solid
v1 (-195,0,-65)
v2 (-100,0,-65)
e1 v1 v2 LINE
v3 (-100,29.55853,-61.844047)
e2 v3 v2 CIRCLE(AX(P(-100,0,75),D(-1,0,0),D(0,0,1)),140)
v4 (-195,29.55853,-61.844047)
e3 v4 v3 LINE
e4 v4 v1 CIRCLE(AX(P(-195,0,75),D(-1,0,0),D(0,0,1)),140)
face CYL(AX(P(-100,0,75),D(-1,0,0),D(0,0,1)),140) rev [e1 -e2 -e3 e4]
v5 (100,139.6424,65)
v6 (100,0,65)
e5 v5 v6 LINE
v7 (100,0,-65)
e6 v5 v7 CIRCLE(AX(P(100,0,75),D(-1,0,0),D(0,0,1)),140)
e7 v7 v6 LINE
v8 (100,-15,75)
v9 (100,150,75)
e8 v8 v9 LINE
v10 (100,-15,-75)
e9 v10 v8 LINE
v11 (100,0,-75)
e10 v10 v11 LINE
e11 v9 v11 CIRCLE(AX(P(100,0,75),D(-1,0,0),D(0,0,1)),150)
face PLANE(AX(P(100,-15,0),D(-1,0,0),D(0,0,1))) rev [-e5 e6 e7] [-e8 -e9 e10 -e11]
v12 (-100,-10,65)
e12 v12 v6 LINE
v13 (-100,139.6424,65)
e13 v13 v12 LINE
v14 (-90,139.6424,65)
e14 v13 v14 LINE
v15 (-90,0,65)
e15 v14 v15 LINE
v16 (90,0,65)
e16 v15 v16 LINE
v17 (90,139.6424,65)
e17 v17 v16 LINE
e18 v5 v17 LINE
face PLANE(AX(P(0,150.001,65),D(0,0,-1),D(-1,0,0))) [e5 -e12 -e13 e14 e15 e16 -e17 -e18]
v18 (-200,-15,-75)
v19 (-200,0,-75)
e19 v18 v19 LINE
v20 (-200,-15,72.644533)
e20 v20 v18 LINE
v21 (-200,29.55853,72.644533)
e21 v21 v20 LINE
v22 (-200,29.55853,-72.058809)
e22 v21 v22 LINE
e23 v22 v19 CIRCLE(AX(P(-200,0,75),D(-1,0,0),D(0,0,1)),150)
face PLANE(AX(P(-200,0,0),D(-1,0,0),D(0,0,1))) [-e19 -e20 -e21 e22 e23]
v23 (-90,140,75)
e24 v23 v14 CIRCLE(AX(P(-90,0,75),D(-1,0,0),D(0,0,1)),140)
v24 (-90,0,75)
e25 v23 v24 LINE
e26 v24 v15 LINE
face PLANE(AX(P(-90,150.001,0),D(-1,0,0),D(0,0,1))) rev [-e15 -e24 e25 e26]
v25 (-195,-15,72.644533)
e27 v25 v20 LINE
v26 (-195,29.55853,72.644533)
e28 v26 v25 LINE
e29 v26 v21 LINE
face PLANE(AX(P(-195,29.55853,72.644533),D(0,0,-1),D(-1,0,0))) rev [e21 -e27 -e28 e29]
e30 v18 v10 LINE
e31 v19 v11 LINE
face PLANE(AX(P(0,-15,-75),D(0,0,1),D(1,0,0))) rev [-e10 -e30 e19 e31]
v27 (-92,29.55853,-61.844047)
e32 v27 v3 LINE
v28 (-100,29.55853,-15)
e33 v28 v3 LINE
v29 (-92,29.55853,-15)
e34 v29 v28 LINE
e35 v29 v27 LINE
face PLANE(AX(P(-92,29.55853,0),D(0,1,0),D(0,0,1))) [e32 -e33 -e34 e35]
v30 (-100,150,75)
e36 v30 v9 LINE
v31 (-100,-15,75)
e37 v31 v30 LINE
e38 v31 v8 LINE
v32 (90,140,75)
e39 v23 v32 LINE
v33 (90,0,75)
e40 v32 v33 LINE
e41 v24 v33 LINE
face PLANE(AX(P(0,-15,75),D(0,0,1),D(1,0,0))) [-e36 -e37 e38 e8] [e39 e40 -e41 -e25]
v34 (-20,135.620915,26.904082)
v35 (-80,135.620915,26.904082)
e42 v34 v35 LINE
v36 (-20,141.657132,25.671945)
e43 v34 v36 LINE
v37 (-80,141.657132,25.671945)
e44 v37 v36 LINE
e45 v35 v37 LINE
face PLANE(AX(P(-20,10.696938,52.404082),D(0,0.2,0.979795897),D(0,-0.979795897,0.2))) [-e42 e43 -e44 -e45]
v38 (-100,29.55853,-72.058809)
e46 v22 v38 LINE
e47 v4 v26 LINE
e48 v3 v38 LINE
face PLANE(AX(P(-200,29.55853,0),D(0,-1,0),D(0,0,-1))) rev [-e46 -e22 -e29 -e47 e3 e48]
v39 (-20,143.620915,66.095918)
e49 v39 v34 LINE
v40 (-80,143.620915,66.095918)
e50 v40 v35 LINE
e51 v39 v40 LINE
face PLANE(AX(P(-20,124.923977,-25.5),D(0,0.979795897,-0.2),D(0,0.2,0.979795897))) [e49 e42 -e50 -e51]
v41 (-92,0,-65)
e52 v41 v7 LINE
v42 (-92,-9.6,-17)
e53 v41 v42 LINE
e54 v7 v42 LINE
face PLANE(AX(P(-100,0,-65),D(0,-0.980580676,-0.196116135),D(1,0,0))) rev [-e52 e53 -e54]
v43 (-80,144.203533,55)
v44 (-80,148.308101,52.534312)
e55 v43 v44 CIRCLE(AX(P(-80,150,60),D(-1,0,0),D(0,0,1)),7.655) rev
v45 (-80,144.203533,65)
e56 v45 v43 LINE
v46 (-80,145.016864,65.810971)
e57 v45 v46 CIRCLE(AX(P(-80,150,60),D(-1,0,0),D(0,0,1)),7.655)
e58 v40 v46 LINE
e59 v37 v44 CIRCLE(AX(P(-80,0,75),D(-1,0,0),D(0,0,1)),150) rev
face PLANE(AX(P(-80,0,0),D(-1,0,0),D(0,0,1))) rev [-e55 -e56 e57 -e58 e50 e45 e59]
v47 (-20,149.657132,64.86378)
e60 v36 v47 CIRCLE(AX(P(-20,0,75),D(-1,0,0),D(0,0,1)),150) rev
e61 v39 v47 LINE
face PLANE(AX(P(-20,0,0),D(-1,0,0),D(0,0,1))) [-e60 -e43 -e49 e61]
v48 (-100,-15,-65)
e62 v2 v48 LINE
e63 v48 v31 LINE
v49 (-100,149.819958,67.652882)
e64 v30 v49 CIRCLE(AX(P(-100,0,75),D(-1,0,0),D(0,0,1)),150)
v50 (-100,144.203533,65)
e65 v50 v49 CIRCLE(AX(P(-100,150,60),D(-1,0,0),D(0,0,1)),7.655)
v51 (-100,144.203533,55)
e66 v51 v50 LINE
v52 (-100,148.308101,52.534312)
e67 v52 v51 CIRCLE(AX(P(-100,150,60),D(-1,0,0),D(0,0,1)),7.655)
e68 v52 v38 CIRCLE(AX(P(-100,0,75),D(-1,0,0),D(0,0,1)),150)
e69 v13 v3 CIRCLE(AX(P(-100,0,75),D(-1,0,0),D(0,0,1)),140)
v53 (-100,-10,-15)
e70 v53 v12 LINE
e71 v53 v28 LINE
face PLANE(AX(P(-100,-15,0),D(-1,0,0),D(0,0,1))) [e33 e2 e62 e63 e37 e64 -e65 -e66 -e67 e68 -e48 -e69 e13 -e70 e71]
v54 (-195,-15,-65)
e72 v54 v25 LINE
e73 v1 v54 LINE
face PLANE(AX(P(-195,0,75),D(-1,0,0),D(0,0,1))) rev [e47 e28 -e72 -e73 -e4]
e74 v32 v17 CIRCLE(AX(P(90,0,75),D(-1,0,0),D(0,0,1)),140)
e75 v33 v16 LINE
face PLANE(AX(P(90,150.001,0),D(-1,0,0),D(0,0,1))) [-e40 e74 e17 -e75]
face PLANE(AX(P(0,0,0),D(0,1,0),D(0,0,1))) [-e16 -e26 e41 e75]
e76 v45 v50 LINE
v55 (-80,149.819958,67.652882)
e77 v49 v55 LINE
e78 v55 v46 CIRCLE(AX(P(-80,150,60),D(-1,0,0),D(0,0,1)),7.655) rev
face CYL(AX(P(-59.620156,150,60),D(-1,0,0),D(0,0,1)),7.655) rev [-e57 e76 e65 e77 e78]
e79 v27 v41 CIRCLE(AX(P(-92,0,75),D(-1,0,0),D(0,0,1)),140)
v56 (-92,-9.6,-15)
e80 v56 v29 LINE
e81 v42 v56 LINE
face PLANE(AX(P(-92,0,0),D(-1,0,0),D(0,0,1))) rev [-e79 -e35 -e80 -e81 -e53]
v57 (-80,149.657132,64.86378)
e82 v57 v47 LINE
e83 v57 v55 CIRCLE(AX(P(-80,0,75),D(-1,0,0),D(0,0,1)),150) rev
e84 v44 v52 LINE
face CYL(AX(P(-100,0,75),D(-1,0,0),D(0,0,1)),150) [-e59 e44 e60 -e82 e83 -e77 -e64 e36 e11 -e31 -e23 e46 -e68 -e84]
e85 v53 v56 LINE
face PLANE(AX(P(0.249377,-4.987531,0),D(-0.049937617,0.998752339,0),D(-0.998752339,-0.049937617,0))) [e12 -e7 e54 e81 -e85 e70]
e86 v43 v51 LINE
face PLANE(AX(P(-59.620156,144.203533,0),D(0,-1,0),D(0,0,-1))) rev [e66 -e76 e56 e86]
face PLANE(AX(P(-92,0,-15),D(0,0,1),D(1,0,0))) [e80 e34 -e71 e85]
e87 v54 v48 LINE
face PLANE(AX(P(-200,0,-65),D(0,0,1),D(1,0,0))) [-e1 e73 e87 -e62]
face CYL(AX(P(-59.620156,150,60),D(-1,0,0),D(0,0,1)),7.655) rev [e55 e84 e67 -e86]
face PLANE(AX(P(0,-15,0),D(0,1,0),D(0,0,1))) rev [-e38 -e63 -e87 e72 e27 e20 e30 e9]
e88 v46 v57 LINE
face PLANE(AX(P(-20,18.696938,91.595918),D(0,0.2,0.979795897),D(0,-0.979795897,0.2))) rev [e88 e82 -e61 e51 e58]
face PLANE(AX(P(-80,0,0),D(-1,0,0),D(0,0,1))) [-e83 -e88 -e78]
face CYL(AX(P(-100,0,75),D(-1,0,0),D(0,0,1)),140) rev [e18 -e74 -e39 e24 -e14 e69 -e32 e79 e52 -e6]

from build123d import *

# Parameters (mm, degrees)
SKETCH1_W                = 200
SKETCH1_H                = 150
BOSS_EXTRUDE1_DEPTH      = 15
SKETCH1_5_W              = 200
SKETCH1_5_H              = 10
REVOLVE1_ANGLE           = 90
BOSS_EXTRUDE3_REACH      = 197.256
BOSS_EXTRUDE3_END_RADIUS = 140
SKETCH1_6_W              = 10
SKETCH1_6_H              = 10
CUT_EXTRUDE2_DEPTH       = 60
CUT_EXTRUDE3_DEPTH       = 20
CUT_LOFT8_START          = -65
CUT_LOFT8_DEPTH          = 130
CUT_LOFT8_START_2        = -100
CUT_LOFT8_2_DEPTH        = 200
BOSS_EXTRUDE5_DEPTH      = 100
BOSS_EXTRUDE6_START      = -8
BOSS_EXTRUDE6_DEPTH      = 8
BOSS_EXTRUDE7_START      = -5
BOSS_EXTRUDE7_DEPTH      = 5


with BuildPart() as part:
    # Sketch1 → Boss-Extrude1 (new body)
    with BuildSketch(Plane(origin=(0, 0, 0), x_dir=(1, 0, 0), z_dir=(0, 1, 0))):
        Rectangle(SKETCH1_W, SKETCH1_H)
    extrude(amount=-BOSS_EXTRUDE1_DEPTH)

    # Sketch1<5> → Revolve1 (revolve)
    with BuildSketch(Plane(origin=(0, 0, 0), x_dir=(1, 0, 0), z_dir=(0, 1, 0))):
        with Locations((0, 70)):
            Rectangle(SKETCH1_5_W, SKETCH1_5_H)
    revolve(axis=Axis((-100, 0, 75), (1, 0, 0)), revolution_arc=REVOLVE1_ANGLE)

    # Boss-Extrude3: up to this cylinder (the profile starts inside it)
    boss_extrude3_end = Plane(origin=(0, 0, 75), z_dir=(-1, 0, 0)) * Cylinder(BOSS_EXTRUDE3_END_RADIUS, 865.512, mode=Mode.PRIVATE)
    # Sketch1<6> → Boss-Extrude3 (add, up to the surface)
    with BuildSketch(Plane(origin=(0, 0, 0), x_dir=(1, 0, 0), z_dir=(0, 1, 0)), mode=Mode.PRIVATE) as boss_extrude3_sk1:
        with Locations((-95, -70)):
            Rectangle(SKETCH1_6_W, SKETCH1_6_H)
    boss_extrude3_tool1 = extrude(boss_extrude3_sk1.sketch, amount=BOSS_EXTRUDE3_REACH, mode=Mode.PRIVATE) & boss_extrude3_end
    add(boss_extrude3_tool1.solids().sort_by_distance((-95, 0, 70))[0])
    # Sketch1<6> → Boss-Extrude3 (add, up to the surface)
    with BuildSketch(Plane(origin=(0, 0, 0), x_dir=(1, 0, 0), z_dir=(0, 1, 0)), mode=Mode.PRIVATE) as boss_extrude3_sk2:
        with Locations((95, -70)):
            Rectangle(SKETCH1_6_W, SKETCH1_6_H)
    boss_extrude3_tool2 = extrude(boss_extrude3_sk2.sketch, amount=BOSS_EXTRUDE3_REACH, mode=Mode.PRIVATE) & boss_extrude3_end
    add(boss_extrude3_tool2.solids().sort_by_distance((95, 0, 70))[0])

    # Sketch5 → Cut-Extrude2 (cut)
    with BuildSketch(Plane.ZY.offset(80)):
        Polygon((66.095917942, 143.620915339), (26.904082058, 135.620915339), (21.904082058, 160.115812766), (61.095917942, 168.115812766), align=None)
    extrude(amount=-CUT_EXTRUDE2_DEPTH, mode=Mode.SUBTRACT)

    # Sketch6 → Cut-Extrude3 (cut)
    with BuildSketch(Plane.ZY.offset(100)):
        with BuildLine():
            Line((55, 144.203533404), (65, 144.203533404))
            ThreePointArc((65, 144.203533404), (60, 157.655), (55, 144.203533404))
        make_face()
    extrude(amount=-CUT_EXTRUDE3_DEPTH, mode=Mode.SUBTRACT)

    # Cut-Loft8: read off the stored shape, not the designer's step
    # Cut-Loft8 outline → Cut-Loft8 (cut)
    with BuildSketch(Plane.XY.offset(CUT_LOFT8_START)):
        Polygon((-100, -10), (100, 0), (-100, 0), align=None)
    extrude(amount=CUT_LOFT8_DEPTH, mode=Mode.SUBTRACT)

    # Cut-Loft8 2 outline → Cut-Loft8 2 (add)
    with BuildSketch(Plane.YZ.offset(CUT_LOFT8_START_2)):
        Polygon((0, -65), (-10.4, -13), (-12, -13), (-12, -65), align=None)
    extrude(amount=CUT_LOFT8_2_DEPTH)

    # Sketch12 → Boss-Extrude5 (add)
    with BuildSketch(Plane.ZY.offset(100)):
        with BuildLine():
            Line((-65, -15), (-65, 0))
            ThreePointArc((-65, 0), (-64.208776017, 14.863266125), (-61.84404743, 29.558529783))
            Line((-61.84404743, 29.558529783), (-72.058809043, 29.558529783))
            ThreePointArc((-72.058809043, 29.558529783), (-74.262891163, 14.852249722), (-75, 0))
            Line((-75, 0), (-75, -15))
            Line((-75, -15), (-65, -15))
        make_face()
    extrude(amount=BOSS_EXTRUDE5_DEPTH)

    # Sketch12<4> → Boss-Extrude6 (add)
    with BuildSketch(Plane.ZY.offset(100).offset(BOSS_EXTRUDE6_START)):
        with BuildLine():
            Line((-65, 0), (-15, -10))
            Line((-15, -10), (-15, 29.558529783))
            Line((-15, 29.558529783), (-61.84404743, 29.558529783))
            ThreePointArc((-61.84404743, 29.558529783), (-64.208776017, 14.863266125), (-65, 0))
        make_face()
    extrude(amount=BOSS_EXTRUDE6_DEPTH)

    # Sketch21 → Boss-Extrude7 (add)
    with BuildSketch(Plane.ZY.offset(200).offset(BOSS_EXTRUDE7_START)):
        with BuildLine():
            Line((-61.84404743, 29.558529783), (72.644533384, 29.558529783))
            Line((72.644533384, 29.558529783), (72.644533384, -15))
            Line((72.644533384, -15), (-65, -15))
            Line((-65, -15), (-65, 0))
            ThreePointArc((-65, 0), (-64.208776017, 14.863266125), (-61.84404743, 29.558529783))
        make_face()
    extrude(amount=BOSS_EXTRUDE7_DEPTH)


solid = part.part
